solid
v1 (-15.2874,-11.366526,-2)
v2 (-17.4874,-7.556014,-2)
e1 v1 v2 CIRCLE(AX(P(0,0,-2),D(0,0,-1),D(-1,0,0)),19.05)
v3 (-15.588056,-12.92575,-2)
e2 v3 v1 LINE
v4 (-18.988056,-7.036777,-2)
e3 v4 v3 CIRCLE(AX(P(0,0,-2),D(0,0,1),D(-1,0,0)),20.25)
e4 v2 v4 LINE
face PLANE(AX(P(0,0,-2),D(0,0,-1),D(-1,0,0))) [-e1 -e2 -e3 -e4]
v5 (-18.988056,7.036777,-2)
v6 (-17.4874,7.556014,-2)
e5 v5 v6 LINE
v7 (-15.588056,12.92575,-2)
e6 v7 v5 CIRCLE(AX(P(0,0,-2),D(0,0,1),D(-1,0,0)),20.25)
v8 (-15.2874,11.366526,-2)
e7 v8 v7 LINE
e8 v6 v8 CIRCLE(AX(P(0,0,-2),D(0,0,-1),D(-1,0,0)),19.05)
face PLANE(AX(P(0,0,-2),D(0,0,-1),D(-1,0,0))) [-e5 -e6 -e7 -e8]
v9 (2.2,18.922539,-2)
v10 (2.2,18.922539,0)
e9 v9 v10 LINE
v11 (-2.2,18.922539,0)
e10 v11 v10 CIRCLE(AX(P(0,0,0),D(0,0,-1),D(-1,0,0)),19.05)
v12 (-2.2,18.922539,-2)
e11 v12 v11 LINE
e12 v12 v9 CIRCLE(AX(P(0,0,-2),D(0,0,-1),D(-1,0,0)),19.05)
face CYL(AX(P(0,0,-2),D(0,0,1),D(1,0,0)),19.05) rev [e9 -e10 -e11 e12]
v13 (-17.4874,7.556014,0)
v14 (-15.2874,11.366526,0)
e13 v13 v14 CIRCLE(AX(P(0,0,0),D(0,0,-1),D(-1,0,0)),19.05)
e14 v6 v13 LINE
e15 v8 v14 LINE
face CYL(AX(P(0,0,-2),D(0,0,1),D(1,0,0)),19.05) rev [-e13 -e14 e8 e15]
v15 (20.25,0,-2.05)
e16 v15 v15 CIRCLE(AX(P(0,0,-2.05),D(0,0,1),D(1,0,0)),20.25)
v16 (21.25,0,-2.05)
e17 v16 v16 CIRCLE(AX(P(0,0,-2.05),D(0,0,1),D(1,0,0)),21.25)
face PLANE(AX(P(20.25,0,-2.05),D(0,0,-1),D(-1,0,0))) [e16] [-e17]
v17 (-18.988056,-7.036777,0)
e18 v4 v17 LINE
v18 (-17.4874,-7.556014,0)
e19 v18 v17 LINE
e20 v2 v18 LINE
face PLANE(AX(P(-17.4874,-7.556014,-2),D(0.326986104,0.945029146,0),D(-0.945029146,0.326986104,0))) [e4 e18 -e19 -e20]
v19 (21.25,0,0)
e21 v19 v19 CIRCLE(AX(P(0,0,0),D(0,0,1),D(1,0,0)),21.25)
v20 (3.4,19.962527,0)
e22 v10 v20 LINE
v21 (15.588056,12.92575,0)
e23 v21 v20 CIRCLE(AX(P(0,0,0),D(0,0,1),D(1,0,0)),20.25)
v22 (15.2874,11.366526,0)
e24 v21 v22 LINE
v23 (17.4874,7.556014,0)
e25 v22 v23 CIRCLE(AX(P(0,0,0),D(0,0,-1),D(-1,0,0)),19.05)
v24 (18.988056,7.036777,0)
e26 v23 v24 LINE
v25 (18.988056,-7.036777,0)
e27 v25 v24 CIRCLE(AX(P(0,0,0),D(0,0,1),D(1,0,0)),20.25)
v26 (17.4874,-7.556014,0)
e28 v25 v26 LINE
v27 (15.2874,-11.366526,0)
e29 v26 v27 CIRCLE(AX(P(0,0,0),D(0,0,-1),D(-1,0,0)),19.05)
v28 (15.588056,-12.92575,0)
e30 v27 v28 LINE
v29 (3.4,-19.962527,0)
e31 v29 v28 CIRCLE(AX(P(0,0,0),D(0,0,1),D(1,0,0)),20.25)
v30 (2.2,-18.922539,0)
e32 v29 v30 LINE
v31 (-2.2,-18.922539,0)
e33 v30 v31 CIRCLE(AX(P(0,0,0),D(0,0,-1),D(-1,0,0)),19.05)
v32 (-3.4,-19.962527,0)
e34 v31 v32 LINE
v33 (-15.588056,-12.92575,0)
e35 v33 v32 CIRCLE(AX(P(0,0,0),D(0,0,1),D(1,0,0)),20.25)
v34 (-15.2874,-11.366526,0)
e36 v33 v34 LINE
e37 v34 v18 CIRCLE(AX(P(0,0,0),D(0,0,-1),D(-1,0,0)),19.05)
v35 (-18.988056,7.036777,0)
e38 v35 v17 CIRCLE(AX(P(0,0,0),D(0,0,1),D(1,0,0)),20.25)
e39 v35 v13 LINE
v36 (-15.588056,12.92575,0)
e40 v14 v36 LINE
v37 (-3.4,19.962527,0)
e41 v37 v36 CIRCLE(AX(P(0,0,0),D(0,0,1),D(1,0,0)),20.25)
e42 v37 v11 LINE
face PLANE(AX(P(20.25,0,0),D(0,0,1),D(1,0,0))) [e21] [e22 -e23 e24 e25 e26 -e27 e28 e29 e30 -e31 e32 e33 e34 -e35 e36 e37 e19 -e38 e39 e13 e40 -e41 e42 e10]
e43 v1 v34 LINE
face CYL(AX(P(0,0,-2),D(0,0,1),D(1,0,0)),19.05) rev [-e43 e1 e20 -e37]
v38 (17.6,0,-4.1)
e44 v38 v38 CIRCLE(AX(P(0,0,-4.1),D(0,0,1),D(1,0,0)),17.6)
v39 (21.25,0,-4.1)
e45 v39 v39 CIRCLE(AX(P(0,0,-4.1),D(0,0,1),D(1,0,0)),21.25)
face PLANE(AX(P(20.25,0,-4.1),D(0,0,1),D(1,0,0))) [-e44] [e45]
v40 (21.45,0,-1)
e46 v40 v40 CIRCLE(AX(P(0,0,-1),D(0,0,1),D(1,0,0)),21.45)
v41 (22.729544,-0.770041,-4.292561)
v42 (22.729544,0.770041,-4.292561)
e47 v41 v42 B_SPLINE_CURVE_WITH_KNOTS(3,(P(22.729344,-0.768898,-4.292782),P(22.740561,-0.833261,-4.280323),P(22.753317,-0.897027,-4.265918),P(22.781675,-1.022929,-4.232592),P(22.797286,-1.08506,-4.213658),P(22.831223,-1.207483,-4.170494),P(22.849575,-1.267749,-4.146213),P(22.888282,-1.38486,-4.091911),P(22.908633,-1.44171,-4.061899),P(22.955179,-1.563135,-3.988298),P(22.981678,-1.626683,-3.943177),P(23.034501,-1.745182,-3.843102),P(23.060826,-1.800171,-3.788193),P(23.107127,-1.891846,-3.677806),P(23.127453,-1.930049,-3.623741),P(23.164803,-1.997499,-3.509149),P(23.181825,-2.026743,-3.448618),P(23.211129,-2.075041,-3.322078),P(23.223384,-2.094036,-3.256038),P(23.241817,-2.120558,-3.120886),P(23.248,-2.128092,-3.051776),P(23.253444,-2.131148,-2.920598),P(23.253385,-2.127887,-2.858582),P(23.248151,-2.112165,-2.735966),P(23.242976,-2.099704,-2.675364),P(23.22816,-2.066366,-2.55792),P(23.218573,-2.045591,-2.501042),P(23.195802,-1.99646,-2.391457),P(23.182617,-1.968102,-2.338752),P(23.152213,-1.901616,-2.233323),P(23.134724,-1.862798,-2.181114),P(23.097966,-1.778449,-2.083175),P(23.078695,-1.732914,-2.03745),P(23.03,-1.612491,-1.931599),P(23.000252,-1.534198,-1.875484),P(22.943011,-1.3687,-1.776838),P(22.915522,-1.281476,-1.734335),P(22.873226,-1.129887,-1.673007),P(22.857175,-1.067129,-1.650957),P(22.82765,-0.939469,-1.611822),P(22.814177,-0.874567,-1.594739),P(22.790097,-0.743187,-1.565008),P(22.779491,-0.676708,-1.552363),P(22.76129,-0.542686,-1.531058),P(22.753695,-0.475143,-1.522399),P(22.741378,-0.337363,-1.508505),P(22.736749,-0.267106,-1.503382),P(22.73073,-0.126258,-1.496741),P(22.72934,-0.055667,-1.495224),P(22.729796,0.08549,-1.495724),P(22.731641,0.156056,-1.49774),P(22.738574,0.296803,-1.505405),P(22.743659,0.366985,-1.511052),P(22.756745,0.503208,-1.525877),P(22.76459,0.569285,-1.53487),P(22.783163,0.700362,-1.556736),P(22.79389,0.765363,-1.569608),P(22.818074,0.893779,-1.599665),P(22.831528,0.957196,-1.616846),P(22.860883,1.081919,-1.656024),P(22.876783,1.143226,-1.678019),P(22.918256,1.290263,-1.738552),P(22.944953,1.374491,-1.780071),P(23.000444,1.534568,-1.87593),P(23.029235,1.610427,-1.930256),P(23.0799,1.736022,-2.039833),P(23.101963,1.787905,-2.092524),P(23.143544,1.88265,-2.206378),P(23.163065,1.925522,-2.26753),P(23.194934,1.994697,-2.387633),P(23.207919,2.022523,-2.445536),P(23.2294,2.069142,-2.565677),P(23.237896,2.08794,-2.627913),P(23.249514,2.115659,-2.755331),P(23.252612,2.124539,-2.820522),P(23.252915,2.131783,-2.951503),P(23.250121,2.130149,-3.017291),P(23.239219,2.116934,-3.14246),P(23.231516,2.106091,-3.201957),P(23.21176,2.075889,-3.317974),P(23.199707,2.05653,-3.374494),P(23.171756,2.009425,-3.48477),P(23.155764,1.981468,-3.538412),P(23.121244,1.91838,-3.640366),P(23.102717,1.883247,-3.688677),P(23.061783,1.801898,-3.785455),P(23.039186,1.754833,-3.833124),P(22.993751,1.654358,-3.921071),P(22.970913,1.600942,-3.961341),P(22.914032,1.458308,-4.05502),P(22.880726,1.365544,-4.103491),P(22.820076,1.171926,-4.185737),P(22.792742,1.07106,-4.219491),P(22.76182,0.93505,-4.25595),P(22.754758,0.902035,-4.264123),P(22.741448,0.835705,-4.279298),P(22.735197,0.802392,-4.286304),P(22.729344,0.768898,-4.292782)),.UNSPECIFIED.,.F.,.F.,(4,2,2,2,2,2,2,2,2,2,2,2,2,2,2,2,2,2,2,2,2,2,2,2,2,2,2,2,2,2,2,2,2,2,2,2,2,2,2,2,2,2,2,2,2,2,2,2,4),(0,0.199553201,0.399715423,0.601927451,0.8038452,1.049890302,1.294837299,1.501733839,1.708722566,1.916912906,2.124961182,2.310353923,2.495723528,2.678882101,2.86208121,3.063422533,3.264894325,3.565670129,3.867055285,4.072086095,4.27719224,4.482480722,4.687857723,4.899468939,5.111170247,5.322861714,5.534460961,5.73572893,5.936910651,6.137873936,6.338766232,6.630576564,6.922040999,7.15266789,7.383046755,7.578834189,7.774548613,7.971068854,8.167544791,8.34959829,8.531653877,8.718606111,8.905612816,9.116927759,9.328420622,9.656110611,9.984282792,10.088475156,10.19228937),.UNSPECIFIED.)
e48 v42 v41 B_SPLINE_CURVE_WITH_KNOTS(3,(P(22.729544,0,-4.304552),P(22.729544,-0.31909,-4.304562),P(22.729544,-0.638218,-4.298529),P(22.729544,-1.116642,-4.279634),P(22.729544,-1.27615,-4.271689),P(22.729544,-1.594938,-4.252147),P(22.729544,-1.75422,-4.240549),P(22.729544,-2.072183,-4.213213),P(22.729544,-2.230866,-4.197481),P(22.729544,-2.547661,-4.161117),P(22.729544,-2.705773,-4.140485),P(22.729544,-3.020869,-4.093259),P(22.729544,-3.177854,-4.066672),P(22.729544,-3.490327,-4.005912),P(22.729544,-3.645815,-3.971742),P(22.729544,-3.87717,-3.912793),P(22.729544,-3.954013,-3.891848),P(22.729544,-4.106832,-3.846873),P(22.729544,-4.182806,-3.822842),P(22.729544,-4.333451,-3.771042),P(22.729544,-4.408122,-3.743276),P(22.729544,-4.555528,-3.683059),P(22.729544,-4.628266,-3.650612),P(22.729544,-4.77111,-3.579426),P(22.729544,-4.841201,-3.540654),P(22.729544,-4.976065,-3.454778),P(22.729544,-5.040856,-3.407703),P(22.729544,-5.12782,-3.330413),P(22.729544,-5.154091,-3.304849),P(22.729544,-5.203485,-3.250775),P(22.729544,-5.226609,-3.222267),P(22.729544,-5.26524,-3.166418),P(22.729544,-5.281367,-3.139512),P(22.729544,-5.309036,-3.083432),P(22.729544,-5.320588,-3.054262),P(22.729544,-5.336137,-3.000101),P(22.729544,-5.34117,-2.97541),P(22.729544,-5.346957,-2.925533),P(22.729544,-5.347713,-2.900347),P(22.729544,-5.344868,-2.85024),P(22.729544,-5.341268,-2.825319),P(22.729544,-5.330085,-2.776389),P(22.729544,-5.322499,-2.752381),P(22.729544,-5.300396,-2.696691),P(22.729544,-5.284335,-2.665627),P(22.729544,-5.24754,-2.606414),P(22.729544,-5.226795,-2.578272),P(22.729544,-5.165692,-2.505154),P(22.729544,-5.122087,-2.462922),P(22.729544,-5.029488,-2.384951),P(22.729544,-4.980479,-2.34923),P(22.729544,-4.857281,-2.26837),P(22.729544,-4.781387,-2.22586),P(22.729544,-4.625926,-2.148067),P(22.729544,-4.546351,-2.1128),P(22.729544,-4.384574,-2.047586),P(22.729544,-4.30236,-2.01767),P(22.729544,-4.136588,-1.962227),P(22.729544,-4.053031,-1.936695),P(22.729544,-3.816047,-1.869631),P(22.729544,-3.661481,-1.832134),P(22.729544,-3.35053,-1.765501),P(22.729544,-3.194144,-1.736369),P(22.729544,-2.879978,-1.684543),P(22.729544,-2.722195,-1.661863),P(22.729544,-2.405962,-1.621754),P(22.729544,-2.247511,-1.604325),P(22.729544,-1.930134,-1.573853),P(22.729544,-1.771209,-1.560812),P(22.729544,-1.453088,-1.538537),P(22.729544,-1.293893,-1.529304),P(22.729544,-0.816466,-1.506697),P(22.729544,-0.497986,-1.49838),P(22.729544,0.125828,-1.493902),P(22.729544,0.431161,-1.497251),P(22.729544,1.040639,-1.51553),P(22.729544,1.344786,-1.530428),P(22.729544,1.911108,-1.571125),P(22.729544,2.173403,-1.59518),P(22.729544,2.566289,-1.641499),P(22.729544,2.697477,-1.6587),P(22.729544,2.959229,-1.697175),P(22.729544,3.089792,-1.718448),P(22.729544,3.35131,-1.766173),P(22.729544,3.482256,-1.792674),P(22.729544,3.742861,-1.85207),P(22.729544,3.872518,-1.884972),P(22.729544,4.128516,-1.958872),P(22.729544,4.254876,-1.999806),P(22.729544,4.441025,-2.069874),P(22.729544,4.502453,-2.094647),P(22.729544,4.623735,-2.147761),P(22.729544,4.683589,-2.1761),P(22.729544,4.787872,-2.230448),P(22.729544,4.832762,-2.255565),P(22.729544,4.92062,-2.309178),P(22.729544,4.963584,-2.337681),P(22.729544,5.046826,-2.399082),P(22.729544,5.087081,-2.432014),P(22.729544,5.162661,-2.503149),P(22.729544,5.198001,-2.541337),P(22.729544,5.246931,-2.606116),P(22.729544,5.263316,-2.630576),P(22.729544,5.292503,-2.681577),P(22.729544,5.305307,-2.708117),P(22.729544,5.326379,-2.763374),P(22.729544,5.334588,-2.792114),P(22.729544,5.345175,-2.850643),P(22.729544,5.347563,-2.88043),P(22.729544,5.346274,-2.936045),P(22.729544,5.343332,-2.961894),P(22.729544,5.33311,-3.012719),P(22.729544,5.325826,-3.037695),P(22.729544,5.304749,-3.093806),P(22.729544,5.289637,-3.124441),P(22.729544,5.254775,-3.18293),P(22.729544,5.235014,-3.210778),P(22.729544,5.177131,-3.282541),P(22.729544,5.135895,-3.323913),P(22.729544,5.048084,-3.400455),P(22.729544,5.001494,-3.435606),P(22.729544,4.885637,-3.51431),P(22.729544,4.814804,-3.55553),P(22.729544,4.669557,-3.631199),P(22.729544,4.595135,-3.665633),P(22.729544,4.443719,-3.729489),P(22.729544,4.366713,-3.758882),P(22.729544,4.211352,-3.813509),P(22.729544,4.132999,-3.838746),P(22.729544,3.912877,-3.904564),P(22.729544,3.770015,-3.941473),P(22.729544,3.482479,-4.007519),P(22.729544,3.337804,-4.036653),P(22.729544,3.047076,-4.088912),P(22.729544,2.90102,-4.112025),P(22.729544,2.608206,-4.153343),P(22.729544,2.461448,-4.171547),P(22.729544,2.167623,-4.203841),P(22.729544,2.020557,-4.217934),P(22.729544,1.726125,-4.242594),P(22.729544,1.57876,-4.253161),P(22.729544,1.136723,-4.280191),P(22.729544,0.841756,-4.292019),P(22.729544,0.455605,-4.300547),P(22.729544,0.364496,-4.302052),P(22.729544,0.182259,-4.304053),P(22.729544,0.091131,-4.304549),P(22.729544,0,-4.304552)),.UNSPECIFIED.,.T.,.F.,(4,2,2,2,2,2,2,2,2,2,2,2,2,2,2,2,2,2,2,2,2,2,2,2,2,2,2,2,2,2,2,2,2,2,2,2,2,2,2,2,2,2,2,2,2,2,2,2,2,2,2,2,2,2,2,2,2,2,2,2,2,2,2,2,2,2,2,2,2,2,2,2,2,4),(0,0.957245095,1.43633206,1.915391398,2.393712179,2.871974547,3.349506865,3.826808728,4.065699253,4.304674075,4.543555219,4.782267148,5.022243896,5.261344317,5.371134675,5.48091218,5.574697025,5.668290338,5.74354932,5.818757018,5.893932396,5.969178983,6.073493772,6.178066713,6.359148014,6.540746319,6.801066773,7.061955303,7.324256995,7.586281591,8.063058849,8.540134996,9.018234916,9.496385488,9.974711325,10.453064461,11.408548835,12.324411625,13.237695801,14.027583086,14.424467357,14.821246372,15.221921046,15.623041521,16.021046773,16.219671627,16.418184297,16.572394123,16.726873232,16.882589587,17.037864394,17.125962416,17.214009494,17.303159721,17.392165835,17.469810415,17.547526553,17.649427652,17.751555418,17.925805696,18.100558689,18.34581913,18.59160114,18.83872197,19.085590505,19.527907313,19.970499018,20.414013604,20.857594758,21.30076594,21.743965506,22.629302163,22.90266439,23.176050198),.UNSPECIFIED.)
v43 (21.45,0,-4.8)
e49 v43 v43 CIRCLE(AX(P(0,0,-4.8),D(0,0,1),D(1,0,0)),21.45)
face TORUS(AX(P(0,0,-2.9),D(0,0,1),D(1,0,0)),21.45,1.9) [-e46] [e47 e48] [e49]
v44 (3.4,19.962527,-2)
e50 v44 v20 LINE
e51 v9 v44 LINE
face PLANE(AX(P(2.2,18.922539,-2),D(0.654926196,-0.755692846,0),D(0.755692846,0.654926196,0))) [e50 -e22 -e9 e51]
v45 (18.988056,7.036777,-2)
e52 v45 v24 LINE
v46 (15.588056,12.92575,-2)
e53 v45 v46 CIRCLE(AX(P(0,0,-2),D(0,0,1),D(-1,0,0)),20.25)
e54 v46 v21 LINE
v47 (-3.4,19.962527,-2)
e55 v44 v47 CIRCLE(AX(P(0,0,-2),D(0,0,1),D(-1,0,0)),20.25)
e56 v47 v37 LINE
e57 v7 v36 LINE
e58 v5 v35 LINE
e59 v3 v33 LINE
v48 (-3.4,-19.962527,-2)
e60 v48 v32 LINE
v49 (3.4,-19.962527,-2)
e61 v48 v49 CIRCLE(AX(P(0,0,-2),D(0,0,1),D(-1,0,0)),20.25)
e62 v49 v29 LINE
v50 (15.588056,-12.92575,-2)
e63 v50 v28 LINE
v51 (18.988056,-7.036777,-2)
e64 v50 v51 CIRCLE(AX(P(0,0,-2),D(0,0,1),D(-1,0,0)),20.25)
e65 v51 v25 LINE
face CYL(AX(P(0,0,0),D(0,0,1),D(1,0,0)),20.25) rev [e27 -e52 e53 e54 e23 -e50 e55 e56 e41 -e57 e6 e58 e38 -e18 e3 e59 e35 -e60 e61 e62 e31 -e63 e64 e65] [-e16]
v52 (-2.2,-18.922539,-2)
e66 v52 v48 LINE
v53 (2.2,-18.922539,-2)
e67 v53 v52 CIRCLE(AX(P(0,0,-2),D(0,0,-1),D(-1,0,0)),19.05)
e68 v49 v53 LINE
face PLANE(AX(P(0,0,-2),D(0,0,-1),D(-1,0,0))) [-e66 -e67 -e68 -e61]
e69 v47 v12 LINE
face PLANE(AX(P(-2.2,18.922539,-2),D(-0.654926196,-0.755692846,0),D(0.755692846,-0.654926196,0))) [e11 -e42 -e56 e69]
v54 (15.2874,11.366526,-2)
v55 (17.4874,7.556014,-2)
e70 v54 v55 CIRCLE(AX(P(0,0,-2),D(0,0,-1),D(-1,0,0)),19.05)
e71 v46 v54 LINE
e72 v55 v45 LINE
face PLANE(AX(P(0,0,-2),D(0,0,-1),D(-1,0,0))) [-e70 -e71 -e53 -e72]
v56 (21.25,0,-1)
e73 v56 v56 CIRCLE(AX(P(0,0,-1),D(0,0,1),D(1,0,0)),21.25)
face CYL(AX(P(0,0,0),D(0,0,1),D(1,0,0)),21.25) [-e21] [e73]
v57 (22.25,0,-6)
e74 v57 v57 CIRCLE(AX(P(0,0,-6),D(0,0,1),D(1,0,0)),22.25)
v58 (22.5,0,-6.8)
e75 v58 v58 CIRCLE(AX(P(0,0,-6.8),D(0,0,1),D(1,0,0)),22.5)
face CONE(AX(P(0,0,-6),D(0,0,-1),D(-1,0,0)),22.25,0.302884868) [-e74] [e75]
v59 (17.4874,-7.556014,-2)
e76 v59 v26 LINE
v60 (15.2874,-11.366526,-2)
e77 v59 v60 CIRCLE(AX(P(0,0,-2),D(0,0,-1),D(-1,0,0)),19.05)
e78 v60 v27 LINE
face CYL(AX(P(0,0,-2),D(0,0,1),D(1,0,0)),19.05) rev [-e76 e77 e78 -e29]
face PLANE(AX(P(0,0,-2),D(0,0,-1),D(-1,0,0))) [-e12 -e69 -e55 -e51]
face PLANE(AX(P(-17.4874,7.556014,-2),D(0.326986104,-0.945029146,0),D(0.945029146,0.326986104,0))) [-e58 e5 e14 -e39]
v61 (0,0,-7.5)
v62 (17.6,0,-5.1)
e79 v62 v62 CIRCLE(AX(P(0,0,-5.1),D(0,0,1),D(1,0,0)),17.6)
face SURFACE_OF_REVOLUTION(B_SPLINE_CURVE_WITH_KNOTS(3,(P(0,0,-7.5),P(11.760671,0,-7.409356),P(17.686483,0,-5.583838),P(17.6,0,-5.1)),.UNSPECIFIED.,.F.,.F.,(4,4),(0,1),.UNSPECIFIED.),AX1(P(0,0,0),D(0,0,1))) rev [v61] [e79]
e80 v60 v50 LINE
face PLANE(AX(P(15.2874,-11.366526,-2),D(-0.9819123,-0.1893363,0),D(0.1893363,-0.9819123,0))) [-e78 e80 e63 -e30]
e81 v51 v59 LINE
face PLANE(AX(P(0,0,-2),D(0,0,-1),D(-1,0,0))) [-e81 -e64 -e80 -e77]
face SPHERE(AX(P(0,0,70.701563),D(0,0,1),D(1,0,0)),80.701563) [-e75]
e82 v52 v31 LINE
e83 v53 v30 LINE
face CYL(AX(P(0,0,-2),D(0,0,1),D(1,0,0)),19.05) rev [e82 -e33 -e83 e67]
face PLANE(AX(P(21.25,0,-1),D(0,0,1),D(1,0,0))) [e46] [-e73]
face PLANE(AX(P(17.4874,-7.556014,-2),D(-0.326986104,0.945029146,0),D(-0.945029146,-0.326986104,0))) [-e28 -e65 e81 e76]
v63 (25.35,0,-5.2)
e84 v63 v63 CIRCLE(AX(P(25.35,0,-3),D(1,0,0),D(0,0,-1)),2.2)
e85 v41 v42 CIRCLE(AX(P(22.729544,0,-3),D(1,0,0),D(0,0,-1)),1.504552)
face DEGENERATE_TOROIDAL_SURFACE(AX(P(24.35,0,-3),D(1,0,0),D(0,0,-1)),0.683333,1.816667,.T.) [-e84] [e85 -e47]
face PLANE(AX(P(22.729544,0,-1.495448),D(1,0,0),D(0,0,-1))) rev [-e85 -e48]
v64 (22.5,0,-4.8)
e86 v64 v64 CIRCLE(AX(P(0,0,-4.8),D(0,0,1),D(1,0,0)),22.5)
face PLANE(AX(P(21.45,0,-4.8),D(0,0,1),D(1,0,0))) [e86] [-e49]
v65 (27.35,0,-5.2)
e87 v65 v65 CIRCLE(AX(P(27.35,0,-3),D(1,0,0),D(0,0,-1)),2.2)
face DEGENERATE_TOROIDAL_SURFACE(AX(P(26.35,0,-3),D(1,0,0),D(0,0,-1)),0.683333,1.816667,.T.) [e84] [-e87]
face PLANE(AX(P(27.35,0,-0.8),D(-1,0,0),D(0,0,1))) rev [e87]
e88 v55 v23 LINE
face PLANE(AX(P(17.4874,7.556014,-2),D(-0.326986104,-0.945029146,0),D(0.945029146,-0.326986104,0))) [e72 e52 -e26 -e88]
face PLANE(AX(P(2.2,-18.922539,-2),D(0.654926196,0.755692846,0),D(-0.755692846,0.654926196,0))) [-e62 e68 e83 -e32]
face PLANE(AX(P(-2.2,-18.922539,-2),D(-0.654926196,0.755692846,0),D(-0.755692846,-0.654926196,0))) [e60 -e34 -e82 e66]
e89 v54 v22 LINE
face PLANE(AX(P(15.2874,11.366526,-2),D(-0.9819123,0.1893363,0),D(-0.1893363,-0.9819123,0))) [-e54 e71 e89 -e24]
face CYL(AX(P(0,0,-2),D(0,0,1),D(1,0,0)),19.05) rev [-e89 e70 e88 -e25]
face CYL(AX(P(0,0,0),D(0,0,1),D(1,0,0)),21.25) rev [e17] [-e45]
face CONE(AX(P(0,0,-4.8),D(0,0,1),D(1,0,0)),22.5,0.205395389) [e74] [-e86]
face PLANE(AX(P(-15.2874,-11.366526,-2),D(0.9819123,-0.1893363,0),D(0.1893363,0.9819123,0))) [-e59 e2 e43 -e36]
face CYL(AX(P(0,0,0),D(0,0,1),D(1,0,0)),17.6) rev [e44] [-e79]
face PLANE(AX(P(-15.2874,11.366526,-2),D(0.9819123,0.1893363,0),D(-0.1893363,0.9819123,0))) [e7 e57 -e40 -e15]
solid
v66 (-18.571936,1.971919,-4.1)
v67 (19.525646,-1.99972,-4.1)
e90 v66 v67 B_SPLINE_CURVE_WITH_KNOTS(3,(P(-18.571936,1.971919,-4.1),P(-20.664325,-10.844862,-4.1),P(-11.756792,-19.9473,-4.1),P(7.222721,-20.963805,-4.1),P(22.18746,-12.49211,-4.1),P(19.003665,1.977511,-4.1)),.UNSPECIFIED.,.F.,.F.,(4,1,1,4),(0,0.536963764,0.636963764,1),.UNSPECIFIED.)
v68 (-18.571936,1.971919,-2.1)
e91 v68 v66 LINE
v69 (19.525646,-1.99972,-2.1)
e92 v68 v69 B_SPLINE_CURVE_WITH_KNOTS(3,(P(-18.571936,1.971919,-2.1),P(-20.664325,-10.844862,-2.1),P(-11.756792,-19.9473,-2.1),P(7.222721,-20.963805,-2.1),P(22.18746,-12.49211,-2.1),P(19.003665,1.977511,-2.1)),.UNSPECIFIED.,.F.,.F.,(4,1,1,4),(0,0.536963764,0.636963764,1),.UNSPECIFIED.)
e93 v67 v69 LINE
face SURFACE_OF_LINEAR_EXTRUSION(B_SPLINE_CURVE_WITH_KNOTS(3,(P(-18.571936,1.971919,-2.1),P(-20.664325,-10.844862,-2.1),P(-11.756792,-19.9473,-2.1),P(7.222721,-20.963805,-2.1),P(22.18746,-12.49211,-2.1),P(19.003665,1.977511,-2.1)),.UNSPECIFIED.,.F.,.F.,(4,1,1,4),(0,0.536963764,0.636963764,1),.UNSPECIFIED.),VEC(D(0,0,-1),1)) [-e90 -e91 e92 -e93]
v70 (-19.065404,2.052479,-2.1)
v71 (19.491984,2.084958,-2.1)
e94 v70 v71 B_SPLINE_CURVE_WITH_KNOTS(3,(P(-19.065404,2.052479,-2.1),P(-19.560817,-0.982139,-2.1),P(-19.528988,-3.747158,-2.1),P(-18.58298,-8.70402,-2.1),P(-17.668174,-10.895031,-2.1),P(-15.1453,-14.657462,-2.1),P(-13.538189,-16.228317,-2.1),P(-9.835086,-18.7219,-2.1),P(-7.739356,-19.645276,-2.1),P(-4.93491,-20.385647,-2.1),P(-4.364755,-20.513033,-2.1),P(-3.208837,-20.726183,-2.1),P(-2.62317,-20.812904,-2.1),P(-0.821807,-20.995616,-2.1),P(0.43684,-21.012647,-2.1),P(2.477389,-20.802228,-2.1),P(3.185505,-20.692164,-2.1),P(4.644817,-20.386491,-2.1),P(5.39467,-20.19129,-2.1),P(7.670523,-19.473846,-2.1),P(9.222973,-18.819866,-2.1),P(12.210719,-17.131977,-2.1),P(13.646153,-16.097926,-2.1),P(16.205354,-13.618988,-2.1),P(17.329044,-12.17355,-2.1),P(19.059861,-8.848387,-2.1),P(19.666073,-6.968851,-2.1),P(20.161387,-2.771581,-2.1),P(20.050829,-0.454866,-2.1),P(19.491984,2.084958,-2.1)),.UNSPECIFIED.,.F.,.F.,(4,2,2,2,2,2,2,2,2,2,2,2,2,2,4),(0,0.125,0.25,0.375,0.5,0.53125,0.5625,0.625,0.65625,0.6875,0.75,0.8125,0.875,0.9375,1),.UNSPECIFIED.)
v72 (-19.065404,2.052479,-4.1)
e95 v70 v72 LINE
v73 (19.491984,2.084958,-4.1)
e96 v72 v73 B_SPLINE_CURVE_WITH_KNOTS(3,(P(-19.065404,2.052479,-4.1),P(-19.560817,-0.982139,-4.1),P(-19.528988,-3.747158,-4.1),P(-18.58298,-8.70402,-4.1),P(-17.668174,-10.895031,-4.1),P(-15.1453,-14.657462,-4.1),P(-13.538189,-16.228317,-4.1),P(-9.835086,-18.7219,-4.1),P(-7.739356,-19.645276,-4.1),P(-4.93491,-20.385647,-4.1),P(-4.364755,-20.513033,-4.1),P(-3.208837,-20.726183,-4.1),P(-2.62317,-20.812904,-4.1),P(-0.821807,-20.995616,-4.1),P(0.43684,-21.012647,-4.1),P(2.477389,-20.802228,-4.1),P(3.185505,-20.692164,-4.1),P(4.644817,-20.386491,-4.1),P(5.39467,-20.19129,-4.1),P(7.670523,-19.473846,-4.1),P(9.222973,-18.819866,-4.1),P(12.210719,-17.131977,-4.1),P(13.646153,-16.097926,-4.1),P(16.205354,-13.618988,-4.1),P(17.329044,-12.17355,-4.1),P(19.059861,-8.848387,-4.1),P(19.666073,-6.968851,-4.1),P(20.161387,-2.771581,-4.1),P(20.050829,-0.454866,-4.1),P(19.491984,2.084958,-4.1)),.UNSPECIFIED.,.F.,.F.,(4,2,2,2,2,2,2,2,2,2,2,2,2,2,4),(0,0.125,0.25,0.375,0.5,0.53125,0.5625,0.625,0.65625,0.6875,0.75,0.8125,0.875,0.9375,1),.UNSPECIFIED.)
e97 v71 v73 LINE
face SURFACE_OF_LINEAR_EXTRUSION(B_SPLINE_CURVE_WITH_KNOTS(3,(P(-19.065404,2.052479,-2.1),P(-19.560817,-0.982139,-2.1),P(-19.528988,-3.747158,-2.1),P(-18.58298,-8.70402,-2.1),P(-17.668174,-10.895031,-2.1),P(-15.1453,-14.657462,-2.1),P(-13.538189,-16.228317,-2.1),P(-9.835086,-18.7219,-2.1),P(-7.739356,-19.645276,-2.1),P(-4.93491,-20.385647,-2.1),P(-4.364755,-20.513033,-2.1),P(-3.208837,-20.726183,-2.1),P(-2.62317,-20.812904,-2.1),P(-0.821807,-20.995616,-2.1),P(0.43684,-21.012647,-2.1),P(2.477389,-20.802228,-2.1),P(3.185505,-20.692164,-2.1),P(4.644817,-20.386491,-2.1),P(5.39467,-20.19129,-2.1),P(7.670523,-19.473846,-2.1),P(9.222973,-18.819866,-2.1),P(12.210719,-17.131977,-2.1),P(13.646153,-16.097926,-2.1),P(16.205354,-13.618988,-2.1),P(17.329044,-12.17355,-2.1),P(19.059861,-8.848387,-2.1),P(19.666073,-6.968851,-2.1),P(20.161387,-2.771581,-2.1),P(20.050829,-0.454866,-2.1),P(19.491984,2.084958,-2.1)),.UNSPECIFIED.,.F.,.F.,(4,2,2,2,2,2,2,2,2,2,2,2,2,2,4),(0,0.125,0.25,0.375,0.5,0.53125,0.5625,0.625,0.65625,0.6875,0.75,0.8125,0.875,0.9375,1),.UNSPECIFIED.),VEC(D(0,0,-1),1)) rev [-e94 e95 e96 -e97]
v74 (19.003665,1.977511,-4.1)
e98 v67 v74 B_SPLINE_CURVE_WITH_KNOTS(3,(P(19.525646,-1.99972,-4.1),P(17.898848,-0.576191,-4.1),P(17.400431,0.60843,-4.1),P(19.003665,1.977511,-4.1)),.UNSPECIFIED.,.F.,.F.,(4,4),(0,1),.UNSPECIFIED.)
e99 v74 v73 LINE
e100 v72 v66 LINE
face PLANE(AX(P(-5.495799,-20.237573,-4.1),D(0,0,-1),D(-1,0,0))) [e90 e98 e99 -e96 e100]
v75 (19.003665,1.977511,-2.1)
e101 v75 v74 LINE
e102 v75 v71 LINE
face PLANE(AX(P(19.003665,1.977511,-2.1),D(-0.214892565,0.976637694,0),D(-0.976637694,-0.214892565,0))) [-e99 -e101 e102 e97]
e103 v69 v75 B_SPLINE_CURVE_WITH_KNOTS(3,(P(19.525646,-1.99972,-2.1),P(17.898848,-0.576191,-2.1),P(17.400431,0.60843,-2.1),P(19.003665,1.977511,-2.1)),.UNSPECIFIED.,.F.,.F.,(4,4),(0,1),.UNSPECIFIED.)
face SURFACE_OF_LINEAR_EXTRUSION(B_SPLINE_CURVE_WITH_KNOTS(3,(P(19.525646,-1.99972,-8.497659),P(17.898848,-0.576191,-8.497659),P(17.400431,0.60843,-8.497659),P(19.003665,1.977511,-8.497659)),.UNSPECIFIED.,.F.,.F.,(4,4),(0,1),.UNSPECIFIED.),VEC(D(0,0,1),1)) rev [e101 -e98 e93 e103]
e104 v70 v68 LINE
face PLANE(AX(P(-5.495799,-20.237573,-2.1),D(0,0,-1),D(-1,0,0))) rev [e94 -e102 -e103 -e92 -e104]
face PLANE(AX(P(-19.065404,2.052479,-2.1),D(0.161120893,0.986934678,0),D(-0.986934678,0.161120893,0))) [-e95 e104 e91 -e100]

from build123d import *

# Parameters (mm, degrees)
EXTRUDE_1_DEPTH    = 2
EXTRUDE_1811_DEPTH = 2
EXTRUDE_1988_DEPTH = 2


# Read off the part's stored shape, not the designer's step: пружина
with BuildPart() as part:
    # Эскиз3 → Повернуть1 (revolve)
    with BuildSketch(Plane(origin=(0, 0, 0), x_dir=(1, 0, 0), z_dir=(0, 1, 0))):
        with BuildLine():
            Line((20.25, 0), (21.25, 0))
            Line((21.25, 0), (21.25, 1))
            Line((21.25, 1), (21.450000000000003, 1))
            ThreePointArc((21.450000000000003, 1), (23.35, 2.9), (21.450000000000003, 4.8))
            Line((21.450000000000003, 4.8), (22.5, 4.8))
            Line((22.5, 4.8), (22.249999999999996, 5.999999999999999))
            Line((22.249999999999996, 5.999999999999999), (22.5, 6.8))
            ThreePointArc((22.5, 6.8), (11.363208173750943, 9.195994971686233), (0, 10))
            Line((0, 10), (0, 7.5))
            add(Edge.make_bspline(
                [(17.6, 5.1), (17.68648321597052, 5.583837835157827), (11.760671311595946, 7.409355669392823), (0, 7.5)],
                knots=[0, 0, 0, 0, 1, 1, 1, 1], degree=3))
            Line((17.6, 5.1), (17.6, 4.099999999999999))
            Line((17.6, 4.099999999999999), (20.25, 4.099999999999999))
            Line((20.25, 4.099999999999999), (21.25, 4.099999999999999))
            Line((21.25, 4.099999999999999), (21.25, 2.0499999999999994))
            Line((21.25, 2.0499999999999994), (20.25, 2.0499999999999994))
            Line((20.25, 2.0499999999999994), (20.25, 0))
        make_face()
    revolve(axis=Axis((0, 0, 0), (0, 0, -1)))

    # Эскиз4 → Повернуть2 (revolve)
    with BuildSketch(Plane(origin=(0, 0, 0), x_dir=(0, 0, -1), z_dir=(0, 1, 0)), mode=Mode.PRIVATE) as revolve_2_sk:
        with BuildLine():
            Line((0.8000000000000034, -27.35), (3.0000000000000036, -27.35))
            Line((3.0000000000000036, -27.35), (3.0000000000000036, -22.729544095990384))
            Line((3.0000000000000036, -22.729544095990384), (1.4954477914950397, -22.729544095990384))
            ThreePointArc((1.4954477914950397, -22.729544095990384), (1.1072583055705365, -22.994415552653194), (0.8000000000000034, -23.35))
            ThreePointArc((0.8000000000000034, -23.35), (0.5000000000000051, -24.350000000000005), (0.8000000000000034, -25.350000000000005))
            ThreePointArc((0.8000000000000034, -25.350000000000005), (0.5000000000000056, -26.350000000000005), (0.8000000000000034, -27.35))
        make_face()
    revolve(revolve_2_sk.sketch.rotate(Axis((27.35, 0, -3.0000000000000036), (-1, 0, 0)), 180), axis=Axis((27.35, 0, -3.0000000000000036), (-1, 0, 0)))

    # Эскиз6 → Бобышка-Вытянуть1 (add)
    with BuildSketch(Plane.XY):
        with BuildLine():
            Line((-2.2, -18.922539470166264), (-3.4, -19.962527395097045))
            ThreePointArc((-3.4, -19.962527395097045), (1.24e-15, -20.25), (3.4, -19.962527395097045))
            Line((3.4, -19.962527395097045), (2.2, -18.922539470166264))
            ThreePointArc((2.2, -18.922539470166264), (1.17e-15, -19.050000000000004), (-2.2, -18.922539470166264))
        make_face()
        with BuildLine():
            Line((-15.28739988527774, -11.366525623408865), (-15.588055847896868, -12.925750070415583))
            ThreePointArc((-15.588055847896868, -12.925750070415583), (-17.537014426634908, -10.124999999999963), (-18.988055847896852, -7.036777324681391))
            Line((-18.988055847896852, -7.036777324681391), (-17.487399885277735, -7.556013846757328))
            ThreePointArc((-17.487399885277735, -7.556013846757328), (-16.497783942093584, -9.524999999999965), (-15.28739988527774, -11.366525623408865))
        make_face()
        with BuildLine():
            Line((-17.487399885277693, 7.556013846757449), (-18.988055847896817, 7.036777324681521))
            ThreePointArc((-18.988055847896817, 7.036777324681521), (-17.53701442663485, 10.125000000000083), (-15.588055847896788, 12.925750070415688))
            Line((-15.588055847896788, 12.925750070415688), (-15.287399885277672, 11.36652562340897))
            ThreePointArc((-15.287399885277672, 11.36652562340897), (-16.497783942093523, 9.525000000000087), (-17.487399885277693, 7.556013846757449))
        make_face()
        with BuildLine():
            Line((-2.1999999999998687, 18.922539470166274), (-3.3999999999998614, 19.96252739509707))
            ThreePointArc((-3.3999999999998614, 19.96252739509707), (1.4063e-13, 20.25), (3.400000000000138, 19.962527395097023))
            Line((3.400000000000138, 19.962527395097023), (2.2000000000001316, 18.92253947016625))
            ThreePointArc((2.2000000000001316, 18.92253947016625), (1.3229e-13, 19.05), (-2.1999999999998687, 18.922539470166274))
        make_face()
        with BuildLine():
            Line((15.287399885277813, 11.366525623408753), (15.58805584789695, 12.925750070415468))
            ThreePointArc((15.58805584789695, 12.925750070415468), (17.53701442663497, 10.124999999999838), (18.988055847896895, 7.036777324681256))
            Line((18.988055847896895, 7.036777324681256), (17.487399885277778, 7.556013846757204))
            ThreePointArc((17.487399885277778, 7.556013846757204), (16.49778394209364, 9.52499999999985), (15.287399885277813, 11.366525623408753))
        make_face()
        with BuildLine():
            Line((17.487399885277625, -7.55601384675757), (18.988055847896756, -7.036777324681652))
            ThreePointArc((18.988055847896756, -7.036777324681652), (17.53701442663477, -10.125000000000204), (15.588055847896687, -12.925750070415797))
            Line((15.588055847896687, -12.925750070415797), (15.287399885277582, -11.366525623409075))
            ThreePointArc((15.287399885277582, -11.366525623409075), (16.497783942093445, -9.52500000000019), (17.487399885277625, -7.55601384675757))
        make_face()
    extrude(amount=-EXTRUDE_1_DEPTH)


with BuildPart() as body_2:
    # Extrude 1811 outline → Extrude 1811 (new body)
    with BuildSketch(Plane.XY.offset(-4.099999999999999)):
        with BuildLine():
            Line((-18.571936423, 1.971918763), (-19.065403762, 2.052479209))
            add(Edge.make_bspline(
                [(-19.065403762, 2.052479209), (-19.5608168488982, -0.982138754343007), (-19.5289875725156, -3.74715756678371), (-18.5829798934297, -8.70402014463167), (-17.6681740511601, -10.8950314599481), (-15.1452997626881, -14.657462235248), (-13.5381887525688, -16.2283170155345), (-9.83508618174293, -18.721900143671), (-7.73935639577416, -19.6452755858668), (-4.93491023286923, -20.3856470306141), (-4.36475543627115, -20.5130328985695), (-3.20883686791784, -20.7261834053054), (-2.62317028558831, -20.8129043899692), (-0.821806580127363, -20.9956157365632), (0.436839580527143, -21.0126468689093), (2.47738891240008, -20.8022281628961), (3.18550462308288, -20.6921642905461), (4.64481731746651, -20.3864905165527), (5.39466991149929, -20.1912898588091), (7.67052292630654, -19.4738461288268), (9.22297257444626, -18.8198657154798), (12.2107189598901, -17.1319774941594), (13.6461529796485, -16.0979257899178), (16.2053537619806, -13.6189879292943), (17.3290438798867, -12.1735499646399), (19.0598614969327, -8.84838748586538), (19.666072598016, -6.96885118670048), (20.161387122414, -2.77158072536785), (20.0508287060798, -0.454865816939449), (19.491983625, 2.084957609)],
                knots=[0, 0, 0, 0, 0.125, 0.125, 0.25, 0.25, 0.375, 0.375, 0.5, 0.5, 0.53125, 0.53125, 0.5625, 0.5625, 0.625, 0.625, 0.65625, 0.65625, 0.6875, 0.6875, 0.75, 0.75, 0.8125, 0.8125, 0.875, 0.875, 0.9375, 0.9375, 1, 1, 1, 1], degree=3))
            Line((19.491983625, 2.084957609), (19.003664778, 1.977511327))
            add(Edge.make_bspline(
                [(-18.571936423, 1.971918763), (-20.6643253902591, -10.8448624589785), (-11.7567916507723, -19.9473001190712), (7.22272099149138, -20.9638051634758), (22.1874596075476, -12.4921099734157), (19.003664778, 1.977511327)],
                knots=[0, 0, 0, 0, 0.536963763998546, 0.636963763998546, 1, 1, 1, 1], degree=3))
        make_face()
    extrude(amount=EXTRUDE_1811_DEPTH)

    # Эскиз8 → Extrude 1988 (add)
    with BuildSketch(Plane.XY.offset(-2.0999999999999988)):
        with BuildLine():
            add(Edge.make_bspline(
                [(19.00366477765303, 1.977511326728632), (19.526518131814505, -0.02531023876852211), (19.52564554450298, -1.9997204689170207)],
                knots=[0, 0, 0, 1, 1, 1], degree=2))
            add(Edge.make_bspline(
                [(19.52564554450298, -1.9997204689170207), (17.898847867822333, -0.5761912037183654), (17.4004310622032, 0.6084296537456167), (19.00366477765303, 1.977511326728632)],
                knots=[0, 0, 0, 0, 1, 1, 1, 1], degree=3))
        make_face()
    extrude(amount=-EXTRUDE_1988_DEPTH)


solid = Compound([part.part, body_2.part])
